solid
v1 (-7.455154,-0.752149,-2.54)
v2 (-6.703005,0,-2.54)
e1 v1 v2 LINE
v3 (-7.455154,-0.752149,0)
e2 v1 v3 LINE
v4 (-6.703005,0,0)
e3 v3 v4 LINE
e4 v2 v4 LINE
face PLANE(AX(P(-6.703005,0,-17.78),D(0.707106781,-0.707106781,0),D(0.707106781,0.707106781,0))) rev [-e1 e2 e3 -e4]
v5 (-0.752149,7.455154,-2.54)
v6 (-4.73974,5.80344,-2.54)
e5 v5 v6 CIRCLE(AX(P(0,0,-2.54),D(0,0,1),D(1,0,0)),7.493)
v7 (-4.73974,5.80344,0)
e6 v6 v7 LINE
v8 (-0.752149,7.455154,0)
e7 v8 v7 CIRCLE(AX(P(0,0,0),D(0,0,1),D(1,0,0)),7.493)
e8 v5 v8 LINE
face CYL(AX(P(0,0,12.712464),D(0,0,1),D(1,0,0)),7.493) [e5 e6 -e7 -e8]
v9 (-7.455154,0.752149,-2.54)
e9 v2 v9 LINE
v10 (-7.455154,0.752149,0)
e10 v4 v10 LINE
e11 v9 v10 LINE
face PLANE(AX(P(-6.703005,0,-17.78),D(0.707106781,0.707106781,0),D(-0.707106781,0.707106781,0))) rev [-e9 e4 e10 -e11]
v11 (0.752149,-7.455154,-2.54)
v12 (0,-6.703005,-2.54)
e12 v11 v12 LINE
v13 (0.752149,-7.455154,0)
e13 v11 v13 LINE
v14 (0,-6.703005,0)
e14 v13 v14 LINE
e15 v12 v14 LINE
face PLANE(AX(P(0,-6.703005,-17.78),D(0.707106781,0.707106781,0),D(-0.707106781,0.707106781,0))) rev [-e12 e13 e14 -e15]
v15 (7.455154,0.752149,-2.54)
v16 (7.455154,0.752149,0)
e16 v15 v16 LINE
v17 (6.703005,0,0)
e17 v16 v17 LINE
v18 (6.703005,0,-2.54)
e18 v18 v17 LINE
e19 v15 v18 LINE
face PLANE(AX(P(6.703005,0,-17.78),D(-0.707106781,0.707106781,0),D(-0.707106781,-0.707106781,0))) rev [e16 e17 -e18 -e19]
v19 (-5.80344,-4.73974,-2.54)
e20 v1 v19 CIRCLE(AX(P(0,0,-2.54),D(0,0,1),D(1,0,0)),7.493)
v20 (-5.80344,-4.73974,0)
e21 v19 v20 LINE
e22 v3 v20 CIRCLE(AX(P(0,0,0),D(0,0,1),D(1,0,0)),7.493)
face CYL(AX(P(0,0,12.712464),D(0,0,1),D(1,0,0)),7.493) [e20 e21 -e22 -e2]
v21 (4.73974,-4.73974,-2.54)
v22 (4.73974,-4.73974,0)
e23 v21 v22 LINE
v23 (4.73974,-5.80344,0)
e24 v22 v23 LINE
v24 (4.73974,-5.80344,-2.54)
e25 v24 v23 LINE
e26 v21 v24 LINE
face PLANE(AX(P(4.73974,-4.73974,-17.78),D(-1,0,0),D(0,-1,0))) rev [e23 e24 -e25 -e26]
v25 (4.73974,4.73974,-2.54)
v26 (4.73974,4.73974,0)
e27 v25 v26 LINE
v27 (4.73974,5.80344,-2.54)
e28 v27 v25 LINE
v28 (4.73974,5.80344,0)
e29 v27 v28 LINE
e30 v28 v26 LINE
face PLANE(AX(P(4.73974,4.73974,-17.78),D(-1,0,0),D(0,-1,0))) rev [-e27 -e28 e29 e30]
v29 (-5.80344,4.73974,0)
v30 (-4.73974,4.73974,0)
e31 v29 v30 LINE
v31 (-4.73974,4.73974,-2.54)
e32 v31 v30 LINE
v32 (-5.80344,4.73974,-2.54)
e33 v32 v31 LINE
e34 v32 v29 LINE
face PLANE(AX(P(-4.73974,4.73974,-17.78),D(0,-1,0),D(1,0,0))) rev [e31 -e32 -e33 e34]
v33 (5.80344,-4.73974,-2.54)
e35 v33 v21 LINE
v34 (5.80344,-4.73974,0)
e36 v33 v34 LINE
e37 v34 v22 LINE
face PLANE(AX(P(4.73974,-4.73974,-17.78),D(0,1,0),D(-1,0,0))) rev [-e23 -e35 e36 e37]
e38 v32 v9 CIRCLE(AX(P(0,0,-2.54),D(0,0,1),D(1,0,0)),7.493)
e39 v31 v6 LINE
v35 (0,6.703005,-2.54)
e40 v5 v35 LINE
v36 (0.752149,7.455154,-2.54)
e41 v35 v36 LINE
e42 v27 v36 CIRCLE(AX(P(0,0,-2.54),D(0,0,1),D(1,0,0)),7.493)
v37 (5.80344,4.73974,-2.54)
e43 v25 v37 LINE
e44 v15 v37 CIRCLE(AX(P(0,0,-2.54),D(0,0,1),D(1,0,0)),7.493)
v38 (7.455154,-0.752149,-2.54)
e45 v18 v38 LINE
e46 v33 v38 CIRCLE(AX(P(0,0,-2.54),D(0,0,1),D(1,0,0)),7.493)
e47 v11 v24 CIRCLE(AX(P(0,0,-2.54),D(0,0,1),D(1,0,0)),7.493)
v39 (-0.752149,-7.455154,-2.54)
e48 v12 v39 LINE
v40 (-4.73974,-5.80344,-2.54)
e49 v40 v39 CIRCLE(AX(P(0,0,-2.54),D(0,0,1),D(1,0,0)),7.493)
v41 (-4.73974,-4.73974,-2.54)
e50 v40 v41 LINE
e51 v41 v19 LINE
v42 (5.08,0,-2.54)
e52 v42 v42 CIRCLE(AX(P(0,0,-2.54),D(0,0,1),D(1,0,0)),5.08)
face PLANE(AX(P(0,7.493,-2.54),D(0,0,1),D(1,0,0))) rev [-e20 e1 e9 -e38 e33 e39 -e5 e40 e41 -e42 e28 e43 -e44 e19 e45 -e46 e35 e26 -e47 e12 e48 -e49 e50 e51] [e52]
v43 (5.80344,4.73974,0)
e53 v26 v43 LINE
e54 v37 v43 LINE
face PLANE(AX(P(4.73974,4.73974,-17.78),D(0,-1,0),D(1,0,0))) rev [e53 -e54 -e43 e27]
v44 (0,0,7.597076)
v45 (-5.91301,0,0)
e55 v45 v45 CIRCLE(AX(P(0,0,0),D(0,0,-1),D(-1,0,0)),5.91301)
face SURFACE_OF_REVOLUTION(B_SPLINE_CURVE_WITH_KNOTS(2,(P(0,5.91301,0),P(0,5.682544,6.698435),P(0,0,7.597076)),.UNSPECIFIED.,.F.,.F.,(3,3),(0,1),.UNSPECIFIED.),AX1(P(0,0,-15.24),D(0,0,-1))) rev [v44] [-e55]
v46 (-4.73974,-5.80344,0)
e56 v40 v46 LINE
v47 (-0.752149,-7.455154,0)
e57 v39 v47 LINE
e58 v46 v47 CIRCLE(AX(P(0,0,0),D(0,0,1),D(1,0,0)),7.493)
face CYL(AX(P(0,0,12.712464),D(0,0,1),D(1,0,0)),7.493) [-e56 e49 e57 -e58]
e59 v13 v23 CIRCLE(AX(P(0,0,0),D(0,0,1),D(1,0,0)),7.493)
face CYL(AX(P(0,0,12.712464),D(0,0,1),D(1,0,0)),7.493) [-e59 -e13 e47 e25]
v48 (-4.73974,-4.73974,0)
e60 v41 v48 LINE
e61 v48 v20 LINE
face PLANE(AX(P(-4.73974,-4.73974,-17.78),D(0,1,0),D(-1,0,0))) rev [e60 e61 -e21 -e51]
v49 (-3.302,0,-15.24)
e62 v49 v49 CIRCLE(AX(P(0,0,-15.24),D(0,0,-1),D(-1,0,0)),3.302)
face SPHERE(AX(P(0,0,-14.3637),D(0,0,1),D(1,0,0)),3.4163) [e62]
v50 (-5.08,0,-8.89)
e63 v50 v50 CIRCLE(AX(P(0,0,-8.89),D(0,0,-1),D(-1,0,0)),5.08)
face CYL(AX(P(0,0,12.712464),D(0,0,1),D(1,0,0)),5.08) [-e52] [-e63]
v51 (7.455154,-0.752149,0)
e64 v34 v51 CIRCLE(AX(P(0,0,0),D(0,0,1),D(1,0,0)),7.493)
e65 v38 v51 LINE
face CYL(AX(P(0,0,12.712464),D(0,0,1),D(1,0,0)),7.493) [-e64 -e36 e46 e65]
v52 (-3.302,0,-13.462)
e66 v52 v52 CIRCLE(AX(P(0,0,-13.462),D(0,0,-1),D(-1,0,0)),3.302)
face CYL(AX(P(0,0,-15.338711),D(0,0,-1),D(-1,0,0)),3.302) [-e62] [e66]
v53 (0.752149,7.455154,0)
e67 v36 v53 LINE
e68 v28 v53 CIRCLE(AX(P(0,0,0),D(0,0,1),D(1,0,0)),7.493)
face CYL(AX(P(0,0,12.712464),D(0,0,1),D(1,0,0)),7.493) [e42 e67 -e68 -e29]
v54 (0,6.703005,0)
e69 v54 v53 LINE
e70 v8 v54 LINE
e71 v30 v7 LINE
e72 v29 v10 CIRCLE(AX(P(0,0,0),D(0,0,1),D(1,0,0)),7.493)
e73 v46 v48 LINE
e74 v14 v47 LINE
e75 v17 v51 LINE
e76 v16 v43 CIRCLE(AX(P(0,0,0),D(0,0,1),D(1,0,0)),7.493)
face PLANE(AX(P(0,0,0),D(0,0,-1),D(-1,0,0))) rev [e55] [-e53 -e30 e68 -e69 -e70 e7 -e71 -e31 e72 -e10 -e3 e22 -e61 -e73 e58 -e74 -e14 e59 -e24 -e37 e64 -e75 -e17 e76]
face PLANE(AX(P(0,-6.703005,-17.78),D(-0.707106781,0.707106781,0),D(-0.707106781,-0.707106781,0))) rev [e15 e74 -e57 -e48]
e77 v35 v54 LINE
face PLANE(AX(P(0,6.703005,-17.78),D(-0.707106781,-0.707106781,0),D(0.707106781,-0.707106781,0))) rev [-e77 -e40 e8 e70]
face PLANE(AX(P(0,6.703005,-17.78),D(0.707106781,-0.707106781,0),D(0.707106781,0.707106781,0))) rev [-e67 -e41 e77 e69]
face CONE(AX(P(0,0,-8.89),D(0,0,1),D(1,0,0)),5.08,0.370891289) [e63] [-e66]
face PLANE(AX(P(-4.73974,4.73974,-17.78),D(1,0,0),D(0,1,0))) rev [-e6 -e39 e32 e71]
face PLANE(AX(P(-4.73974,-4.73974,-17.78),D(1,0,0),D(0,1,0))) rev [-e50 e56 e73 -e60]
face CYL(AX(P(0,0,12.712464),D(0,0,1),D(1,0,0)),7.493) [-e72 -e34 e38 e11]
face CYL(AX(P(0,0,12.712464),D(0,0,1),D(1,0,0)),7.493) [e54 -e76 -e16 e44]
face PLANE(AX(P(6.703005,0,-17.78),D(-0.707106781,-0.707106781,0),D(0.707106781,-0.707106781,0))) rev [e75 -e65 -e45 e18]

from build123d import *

# Parameters (mm, degrees)
DOME1_FACE_RADIUS  = 3.302
DOME1_HEIGHT       = 2.54
CUT_EXTRUDE1_DEPTH = 21.698272826
SEED_CUT_COUNT     = 8


# Read off the part's stored shape, not the designer's step: Cut-Revolve-Thin1
with BuildPart() as part:
    # Sketch1 → Revolve1 (revolve)
    with BuildSketch(Plane(origin=(0, 0, 0), x_dir=(0, 0, -1), z_dir=(1, 0, 0)), mode=Mode.PRIVATE) as revolve1_sk:
        Polygon((0, 0), (0, 7.493), (2.54, 7.493), (2.54, 5.08), (15.24, 5.08), (15.24, 0), align=None)
    revolve(revolve1_sk.sketch.rotate(Axis((0, 0, 12.712464269), (0, 0, -1)), 90), axis=Axis((0, 0, 12.712464269), (0, 0, -1)))

    # Sketch2 → Revolve2 (revolve)
    with BuildSketch(Plane(origin=(0, 0, 0), x_dir=(0, 0, -1), z_dir=(1, 0, 0))):
        with BuildLine():
            Line((0, 0), (-7.597075699, 0))
            add(Edge.make_bspline(
                [(0, 5.913009527), (-6.698434988, 5.682543743), (-7.597075699, 0)],
                knots=[0, 0, 0, 1, 1, 1], degree=2))
            Line((0, 5.913009527), (0, 0))
        make_face()
    revolve(axis=Axis((0, 0, 12.712464269), (0, 0, 1)))

    # Cut-Revolve-Thin1 outline → Cut-Revolve-Thin1 (revolve, cut)
    with BuildSketch(Plane.XZ):
        Polygon((5.08, -8.89), (3.302, -13.462), (3.302, -15.24), (5.08, -15.24), align=None)
    revolve(axis=Axis((0, 0, 0), (0, 0, 1)), mode=Mode.SUBTRACT)

    # Dome1: a dome of height H over a round flat face of radius A is a cap of a sphere of radius (A * A + H * H) / (2 * H)
    dome1_r = (DOME1_FACE_RADIUS * DOME1_FACE_RADIUS + DOME1_HEIGHT * DOME1_HEIGHT) / (2 * DOME1_HEIGHT)
    dome1_base = Plane((0, 0, -15.24), z_dir=(0, 0, -1))
    with Locations(dome1_base.offset(DOME1_HEIGHT - dome1_r)):
        dome1_ball = Sphere(dome1_r, mode=Mode.PRIVATE)
    add(split(dome1_ball, bisect_by=dome1_base, keep=Keep.TOP, mode=Mode.PRIVATE))

    # Sketch4 → Cut-Extrude1 (cut, through all)
    with BuildSketch(Plane.XY):
        with BuildLine():
            Line((0, 6.703004763), (0.752149198, 7.455153961))
            ThreePointArc((0.752149198, 7.455153961), (0, 7.493), (-0.752149198, 7.455153961))
            Line((-0.752149198, 7.455153961), (0, 6.703004763))
        make_face()
    cut_extrude1 = extrude(amount=-CUT_EXTRUDE1_DEPTH, mode=Mode.SUBTRACT)

    # Seed Cut: Cut-Extrude1 ×8 about axis
    seed_cut_axis = Axis((0, 0, 0), (0, 0, 1))
    for i in range(1, SEED_CUT_COUNT):
        add(cut_extrude1.rotate(seed_cut_axis, i * 360 / SEED_CUT_COUNT), mode=Mode.SUBTRACT)


solid = part.part
